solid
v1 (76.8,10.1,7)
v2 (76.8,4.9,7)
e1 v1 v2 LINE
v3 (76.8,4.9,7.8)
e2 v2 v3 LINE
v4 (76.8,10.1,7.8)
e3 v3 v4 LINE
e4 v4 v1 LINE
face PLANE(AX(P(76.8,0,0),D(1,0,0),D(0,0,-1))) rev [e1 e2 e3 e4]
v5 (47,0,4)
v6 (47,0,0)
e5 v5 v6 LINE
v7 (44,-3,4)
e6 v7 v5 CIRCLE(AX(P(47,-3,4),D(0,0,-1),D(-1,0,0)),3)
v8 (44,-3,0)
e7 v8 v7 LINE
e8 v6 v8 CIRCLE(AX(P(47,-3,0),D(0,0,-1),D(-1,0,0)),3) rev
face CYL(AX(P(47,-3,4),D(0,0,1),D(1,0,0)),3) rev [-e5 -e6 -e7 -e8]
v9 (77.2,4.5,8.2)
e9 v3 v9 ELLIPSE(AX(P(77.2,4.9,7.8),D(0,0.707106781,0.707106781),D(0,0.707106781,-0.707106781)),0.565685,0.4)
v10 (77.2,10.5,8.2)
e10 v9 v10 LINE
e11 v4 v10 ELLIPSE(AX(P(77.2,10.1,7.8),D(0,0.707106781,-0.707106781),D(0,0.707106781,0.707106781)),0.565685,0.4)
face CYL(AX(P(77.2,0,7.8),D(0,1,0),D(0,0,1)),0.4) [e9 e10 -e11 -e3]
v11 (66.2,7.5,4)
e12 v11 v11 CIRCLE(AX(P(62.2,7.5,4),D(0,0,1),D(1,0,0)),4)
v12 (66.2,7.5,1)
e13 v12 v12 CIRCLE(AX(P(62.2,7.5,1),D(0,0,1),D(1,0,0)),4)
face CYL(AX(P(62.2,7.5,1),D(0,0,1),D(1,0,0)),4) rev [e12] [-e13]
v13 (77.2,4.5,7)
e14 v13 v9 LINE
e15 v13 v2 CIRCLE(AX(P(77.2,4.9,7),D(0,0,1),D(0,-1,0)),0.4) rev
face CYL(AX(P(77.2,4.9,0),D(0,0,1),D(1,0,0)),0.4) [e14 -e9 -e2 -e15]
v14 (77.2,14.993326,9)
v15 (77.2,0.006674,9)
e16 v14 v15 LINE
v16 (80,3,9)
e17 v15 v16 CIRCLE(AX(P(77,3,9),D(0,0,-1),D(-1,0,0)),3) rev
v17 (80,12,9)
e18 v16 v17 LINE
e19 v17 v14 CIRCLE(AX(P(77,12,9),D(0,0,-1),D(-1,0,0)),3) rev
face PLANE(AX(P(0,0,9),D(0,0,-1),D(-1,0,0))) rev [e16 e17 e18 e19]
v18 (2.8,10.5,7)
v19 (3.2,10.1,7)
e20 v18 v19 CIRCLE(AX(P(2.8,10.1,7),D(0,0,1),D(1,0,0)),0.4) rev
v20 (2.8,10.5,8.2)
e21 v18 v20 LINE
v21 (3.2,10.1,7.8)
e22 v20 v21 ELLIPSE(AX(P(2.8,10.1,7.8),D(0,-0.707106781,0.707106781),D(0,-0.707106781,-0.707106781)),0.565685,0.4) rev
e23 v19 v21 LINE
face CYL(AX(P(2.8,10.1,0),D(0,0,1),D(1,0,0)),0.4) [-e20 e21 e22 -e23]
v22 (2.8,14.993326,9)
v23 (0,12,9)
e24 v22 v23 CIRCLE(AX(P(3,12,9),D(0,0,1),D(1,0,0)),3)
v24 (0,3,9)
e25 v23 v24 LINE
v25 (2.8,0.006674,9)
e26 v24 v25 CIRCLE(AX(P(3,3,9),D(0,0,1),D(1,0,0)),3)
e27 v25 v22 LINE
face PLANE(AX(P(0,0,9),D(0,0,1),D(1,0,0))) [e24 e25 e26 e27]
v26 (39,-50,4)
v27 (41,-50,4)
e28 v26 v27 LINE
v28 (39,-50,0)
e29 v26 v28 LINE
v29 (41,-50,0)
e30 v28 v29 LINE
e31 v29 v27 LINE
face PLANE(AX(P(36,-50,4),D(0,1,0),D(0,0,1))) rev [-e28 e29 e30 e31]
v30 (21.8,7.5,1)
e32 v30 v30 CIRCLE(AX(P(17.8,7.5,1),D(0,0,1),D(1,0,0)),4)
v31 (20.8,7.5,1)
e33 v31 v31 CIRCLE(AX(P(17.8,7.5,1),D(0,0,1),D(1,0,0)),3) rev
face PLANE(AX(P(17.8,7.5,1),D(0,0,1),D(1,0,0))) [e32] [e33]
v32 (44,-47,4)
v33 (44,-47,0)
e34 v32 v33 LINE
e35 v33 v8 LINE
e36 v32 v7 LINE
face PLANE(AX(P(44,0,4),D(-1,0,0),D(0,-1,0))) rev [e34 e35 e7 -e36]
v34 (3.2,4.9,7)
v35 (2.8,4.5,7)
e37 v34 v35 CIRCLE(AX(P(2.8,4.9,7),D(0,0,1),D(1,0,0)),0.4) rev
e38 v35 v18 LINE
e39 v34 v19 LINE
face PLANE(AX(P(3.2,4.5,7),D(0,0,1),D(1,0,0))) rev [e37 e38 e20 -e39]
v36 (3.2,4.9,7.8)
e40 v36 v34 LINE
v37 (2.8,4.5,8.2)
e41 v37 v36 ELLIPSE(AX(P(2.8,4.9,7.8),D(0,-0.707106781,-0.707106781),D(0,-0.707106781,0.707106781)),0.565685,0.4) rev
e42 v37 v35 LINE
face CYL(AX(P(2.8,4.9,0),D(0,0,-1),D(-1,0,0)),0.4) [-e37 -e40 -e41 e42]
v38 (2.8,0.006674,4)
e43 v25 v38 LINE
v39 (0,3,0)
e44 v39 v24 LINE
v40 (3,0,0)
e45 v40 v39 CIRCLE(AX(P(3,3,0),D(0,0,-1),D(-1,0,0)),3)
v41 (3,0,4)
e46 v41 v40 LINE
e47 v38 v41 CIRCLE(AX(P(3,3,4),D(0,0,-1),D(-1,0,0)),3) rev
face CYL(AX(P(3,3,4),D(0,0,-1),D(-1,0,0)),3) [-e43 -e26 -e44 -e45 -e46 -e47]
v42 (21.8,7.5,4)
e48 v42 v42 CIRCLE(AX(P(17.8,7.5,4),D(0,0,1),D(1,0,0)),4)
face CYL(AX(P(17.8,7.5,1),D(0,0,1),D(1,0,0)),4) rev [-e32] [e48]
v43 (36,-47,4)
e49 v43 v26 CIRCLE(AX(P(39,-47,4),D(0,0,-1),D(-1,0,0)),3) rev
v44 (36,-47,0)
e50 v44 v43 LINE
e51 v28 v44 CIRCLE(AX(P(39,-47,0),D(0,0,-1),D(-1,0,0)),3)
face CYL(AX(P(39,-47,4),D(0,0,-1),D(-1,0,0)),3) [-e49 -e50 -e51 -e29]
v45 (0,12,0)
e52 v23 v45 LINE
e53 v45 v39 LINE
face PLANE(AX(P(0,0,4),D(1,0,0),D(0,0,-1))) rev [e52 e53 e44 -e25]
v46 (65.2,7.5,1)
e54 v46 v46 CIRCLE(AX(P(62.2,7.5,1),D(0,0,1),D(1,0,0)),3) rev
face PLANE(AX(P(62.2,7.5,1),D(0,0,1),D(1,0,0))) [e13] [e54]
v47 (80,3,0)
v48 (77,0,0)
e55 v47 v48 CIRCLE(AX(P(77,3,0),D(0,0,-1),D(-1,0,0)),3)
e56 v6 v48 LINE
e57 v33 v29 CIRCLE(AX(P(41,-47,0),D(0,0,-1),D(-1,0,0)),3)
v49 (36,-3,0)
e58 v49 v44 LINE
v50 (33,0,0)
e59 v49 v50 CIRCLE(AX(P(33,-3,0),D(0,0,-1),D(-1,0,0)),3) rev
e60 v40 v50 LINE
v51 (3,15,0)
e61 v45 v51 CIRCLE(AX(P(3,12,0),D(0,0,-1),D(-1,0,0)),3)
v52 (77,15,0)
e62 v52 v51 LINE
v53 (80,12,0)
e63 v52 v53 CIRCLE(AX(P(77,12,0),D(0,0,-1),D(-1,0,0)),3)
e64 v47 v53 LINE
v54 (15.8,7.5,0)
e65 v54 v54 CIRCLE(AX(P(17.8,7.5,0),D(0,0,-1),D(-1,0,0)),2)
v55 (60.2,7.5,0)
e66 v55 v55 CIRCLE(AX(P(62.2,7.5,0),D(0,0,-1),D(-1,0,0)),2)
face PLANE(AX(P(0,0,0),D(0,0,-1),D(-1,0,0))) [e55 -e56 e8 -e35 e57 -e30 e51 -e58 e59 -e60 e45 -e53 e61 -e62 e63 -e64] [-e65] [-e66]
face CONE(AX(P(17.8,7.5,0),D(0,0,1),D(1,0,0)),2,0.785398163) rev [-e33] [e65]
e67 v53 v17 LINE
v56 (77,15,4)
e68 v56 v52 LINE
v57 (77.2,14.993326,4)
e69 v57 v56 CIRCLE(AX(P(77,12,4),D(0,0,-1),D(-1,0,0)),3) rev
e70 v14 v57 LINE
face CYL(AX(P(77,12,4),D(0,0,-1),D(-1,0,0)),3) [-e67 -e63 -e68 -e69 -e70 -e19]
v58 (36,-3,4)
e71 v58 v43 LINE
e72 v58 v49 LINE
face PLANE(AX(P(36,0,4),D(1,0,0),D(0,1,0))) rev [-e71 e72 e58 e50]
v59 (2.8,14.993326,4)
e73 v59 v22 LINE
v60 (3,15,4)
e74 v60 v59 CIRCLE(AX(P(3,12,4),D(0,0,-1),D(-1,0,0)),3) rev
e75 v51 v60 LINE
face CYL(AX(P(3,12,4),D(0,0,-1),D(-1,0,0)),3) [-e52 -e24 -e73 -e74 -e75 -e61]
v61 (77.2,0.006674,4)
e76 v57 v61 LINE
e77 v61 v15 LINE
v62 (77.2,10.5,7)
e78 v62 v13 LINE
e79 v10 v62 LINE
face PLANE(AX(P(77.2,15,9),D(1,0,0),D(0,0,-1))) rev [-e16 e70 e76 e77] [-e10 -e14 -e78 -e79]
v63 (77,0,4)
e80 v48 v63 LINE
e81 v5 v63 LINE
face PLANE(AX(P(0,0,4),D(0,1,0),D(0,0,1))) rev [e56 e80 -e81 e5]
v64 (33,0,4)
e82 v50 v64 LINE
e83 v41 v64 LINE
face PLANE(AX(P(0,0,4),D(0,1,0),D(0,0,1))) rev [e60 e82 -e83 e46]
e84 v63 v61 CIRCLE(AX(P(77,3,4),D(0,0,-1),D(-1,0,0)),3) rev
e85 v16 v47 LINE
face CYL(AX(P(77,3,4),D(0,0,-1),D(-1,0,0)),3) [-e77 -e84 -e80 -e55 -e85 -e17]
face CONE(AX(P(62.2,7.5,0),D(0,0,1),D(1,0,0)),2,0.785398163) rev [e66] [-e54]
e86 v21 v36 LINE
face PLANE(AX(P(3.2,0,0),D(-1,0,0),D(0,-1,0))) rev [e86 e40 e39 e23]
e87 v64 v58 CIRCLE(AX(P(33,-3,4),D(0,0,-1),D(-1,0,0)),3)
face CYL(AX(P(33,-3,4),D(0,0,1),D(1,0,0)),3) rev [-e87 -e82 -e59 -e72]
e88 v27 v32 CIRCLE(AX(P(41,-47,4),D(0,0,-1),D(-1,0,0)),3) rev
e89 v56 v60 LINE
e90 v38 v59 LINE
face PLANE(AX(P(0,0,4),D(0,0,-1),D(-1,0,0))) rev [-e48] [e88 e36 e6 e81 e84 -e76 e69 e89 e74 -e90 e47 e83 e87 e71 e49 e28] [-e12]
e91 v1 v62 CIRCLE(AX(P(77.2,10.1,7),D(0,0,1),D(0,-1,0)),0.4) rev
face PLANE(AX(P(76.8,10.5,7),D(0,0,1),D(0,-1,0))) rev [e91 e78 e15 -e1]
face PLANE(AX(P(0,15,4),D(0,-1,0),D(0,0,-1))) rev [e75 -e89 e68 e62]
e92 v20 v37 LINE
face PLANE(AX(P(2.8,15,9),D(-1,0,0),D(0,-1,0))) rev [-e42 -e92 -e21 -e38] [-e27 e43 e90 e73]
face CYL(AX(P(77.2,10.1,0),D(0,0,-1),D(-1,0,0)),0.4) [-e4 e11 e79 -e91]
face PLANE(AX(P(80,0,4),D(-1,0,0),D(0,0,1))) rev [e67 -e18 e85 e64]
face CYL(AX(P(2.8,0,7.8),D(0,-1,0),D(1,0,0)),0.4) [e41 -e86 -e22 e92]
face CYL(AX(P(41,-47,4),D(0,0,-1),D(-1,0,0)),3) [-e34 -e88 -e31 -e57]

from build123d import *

# Parameters (mm, degrees)
SKETCH1_W           = 80
SKETCH1_H           = 15
BOSS_EXTRUDE1_DEPTH = 4
SKETCH2_W           = 2.8
SKETCH2_H           = 15
BOSS_EXTRUDE2_DEPTH = 5
SKETCH3_W           = 1.2
SKETCH3_H           = 6
BOSS_EXTRUDE3_DEPTH = 0.4
SKETCH4_W           = 1.2
SKETCH4_H           = 6
BOSS_EXTRUDE4_DEPTH = 0.4
FILLET1_R           = 0.4
FILLET2_R           = 3
SKETCH5_W           = 8
SKETCH5_H           = 50
BOSS_EXTRUDE5_DEPTH = 4
FILLET3_R           = 3
SKETCH6_R           = 4
CUT_EXTRUDE1_DEPTH  = 3
SKETCH7_R           = 2
CUT_EXTRUDE2_DEPTH  = 3
CHAMFER1_SIZE       = 1


with BuildPart() as part:
    # Sketch1 → Boss-Extrude1 (new body)
    with BuildSketch(Plane.XY):
        with Locations((40, 7.5)):
            Rectangle(SKETCH1_W, SKETCH1_H)
    extrude(amount=BOSS_EXTRUDE1_DEPTH)

    # Sketch2 → Boss-Extrude2 (add)
    with BuildSketch(Plane.XY.offset(4)):
        with Locations((1.4, 7.5)):
            Rectangle(SKETCH2_W, SKETCH2_H)
        with Locations((78.6, 7.5)):
            Rectangle(SKETCH2_W, SKETCH2_H)
    extrude(amount=BOSS_EXTRUDE2_DEPTH)

    # Sketch3 → Boss-Extrude3 (add)
    with BuildSketch(Plane(origin=(2.8, 0, 0), x_dir=(0, 0, -1), z_dir=(1, 0, 0))):
        with Locations((-7.6, 7.5)):
            Rectangle(SKETCH3_W, SKETCH3_H)
    extrude(amount=BOSS_EXTRUDE3_DEPTH)

    # Sketch4 → Boss-Extrude4 (add)
    with BuildSketch(Plane.ZY.offset(-77.2)):
        with Locations((7.6, 7.5)):
            Rectangle(SKETCH4_W, SKETCH4_H)
    extrude(amount=BOSS_EXTRUDE4_DEPTH)

    # Fillet1
    fillet1_edges = [part.edges().sort_by_distance(p)[0] for p in [
        (3.2, 10.5, 7.6),
        (3.2, 4.5, 7.6),
        (76.8, 10.5, 7.6),
        (76.8, 4.5, 7.6),
        (76.8, 7.5, 8.2),
        (3.2, 7.5, 8.2),
    ]]
    fillet(fillet1_edges, radius=FILLET1_R - 0.0001)  # a hair under: the kernel refuses the full size

    # Fillet2
    fillet2_edges = [part.edges().sort_by_distance(p)[0] for p in [
        (80, 0, 4.5),
        (80, 15, 4.5),
        (0, 0, 4.5),
        (0, 15, 4.5),
    ]]
    fillet(fillet2_edges, radius=FILLET2_R)

    # Sketch5 → Boss-Extrude5 (add)
    with BuildSketch(Plane.XY):
        with Locations((40, -25)):
            Rectangle(SKETCH5_W, SKETCH5_H)
    extrude(amount=BOSS_EXTRUDE5_DEPTH)

    # Fillet3
    fillet3_edges = [part.edges().sort_by_distance(p)[0] for p in [
        (36, 0, 2),
        (36, -50, 2),
        (44, -50, 2),
        (44, 0, 2),
    ]]
    fillet(fillet3_edges, radius=FILLET3_R)

    # Sketch6 → Cut-Extrude1 (cut)
    with BuildSketch(Plane.XY.offset(4)):
        with Locations((17.8, 7.5)):
            Circle(SKETCH6_R)
        with Locations((62.2, 7.5)):
            Circle(SKETCH6_R)
    extrude(amount=-CUT_EXTRUDE1_DEPTH, mode=Mode.SUBTRACT)

    # Sketch7 → Cut-Extrude2 (cut)
    with BuildSketch(Plane.XY.offset(1)):
        with Locations((17.8, 7.5)):
            Circle(SKETCH7_R)
        with Locations((62.2, 7.5)):
            Circle(SKETCH7_R)
    extrude(amount=-CUT_EXTRUDE2_DEPTH, mode=Mode.SUBTRACT)

    # Chamfer1
    chamfer1_edges = [part.edges().sort_by_distance(p)[0] for p in [
        (15.8, 7.5, 1),
        (60.2, 7.5, 1),
    ]]
    chamfer(chamfer1_edges, length=CHAMFER1_SIZE - 0.0001)  # a hair under: the kernel refuses the full size


solid = part.part
